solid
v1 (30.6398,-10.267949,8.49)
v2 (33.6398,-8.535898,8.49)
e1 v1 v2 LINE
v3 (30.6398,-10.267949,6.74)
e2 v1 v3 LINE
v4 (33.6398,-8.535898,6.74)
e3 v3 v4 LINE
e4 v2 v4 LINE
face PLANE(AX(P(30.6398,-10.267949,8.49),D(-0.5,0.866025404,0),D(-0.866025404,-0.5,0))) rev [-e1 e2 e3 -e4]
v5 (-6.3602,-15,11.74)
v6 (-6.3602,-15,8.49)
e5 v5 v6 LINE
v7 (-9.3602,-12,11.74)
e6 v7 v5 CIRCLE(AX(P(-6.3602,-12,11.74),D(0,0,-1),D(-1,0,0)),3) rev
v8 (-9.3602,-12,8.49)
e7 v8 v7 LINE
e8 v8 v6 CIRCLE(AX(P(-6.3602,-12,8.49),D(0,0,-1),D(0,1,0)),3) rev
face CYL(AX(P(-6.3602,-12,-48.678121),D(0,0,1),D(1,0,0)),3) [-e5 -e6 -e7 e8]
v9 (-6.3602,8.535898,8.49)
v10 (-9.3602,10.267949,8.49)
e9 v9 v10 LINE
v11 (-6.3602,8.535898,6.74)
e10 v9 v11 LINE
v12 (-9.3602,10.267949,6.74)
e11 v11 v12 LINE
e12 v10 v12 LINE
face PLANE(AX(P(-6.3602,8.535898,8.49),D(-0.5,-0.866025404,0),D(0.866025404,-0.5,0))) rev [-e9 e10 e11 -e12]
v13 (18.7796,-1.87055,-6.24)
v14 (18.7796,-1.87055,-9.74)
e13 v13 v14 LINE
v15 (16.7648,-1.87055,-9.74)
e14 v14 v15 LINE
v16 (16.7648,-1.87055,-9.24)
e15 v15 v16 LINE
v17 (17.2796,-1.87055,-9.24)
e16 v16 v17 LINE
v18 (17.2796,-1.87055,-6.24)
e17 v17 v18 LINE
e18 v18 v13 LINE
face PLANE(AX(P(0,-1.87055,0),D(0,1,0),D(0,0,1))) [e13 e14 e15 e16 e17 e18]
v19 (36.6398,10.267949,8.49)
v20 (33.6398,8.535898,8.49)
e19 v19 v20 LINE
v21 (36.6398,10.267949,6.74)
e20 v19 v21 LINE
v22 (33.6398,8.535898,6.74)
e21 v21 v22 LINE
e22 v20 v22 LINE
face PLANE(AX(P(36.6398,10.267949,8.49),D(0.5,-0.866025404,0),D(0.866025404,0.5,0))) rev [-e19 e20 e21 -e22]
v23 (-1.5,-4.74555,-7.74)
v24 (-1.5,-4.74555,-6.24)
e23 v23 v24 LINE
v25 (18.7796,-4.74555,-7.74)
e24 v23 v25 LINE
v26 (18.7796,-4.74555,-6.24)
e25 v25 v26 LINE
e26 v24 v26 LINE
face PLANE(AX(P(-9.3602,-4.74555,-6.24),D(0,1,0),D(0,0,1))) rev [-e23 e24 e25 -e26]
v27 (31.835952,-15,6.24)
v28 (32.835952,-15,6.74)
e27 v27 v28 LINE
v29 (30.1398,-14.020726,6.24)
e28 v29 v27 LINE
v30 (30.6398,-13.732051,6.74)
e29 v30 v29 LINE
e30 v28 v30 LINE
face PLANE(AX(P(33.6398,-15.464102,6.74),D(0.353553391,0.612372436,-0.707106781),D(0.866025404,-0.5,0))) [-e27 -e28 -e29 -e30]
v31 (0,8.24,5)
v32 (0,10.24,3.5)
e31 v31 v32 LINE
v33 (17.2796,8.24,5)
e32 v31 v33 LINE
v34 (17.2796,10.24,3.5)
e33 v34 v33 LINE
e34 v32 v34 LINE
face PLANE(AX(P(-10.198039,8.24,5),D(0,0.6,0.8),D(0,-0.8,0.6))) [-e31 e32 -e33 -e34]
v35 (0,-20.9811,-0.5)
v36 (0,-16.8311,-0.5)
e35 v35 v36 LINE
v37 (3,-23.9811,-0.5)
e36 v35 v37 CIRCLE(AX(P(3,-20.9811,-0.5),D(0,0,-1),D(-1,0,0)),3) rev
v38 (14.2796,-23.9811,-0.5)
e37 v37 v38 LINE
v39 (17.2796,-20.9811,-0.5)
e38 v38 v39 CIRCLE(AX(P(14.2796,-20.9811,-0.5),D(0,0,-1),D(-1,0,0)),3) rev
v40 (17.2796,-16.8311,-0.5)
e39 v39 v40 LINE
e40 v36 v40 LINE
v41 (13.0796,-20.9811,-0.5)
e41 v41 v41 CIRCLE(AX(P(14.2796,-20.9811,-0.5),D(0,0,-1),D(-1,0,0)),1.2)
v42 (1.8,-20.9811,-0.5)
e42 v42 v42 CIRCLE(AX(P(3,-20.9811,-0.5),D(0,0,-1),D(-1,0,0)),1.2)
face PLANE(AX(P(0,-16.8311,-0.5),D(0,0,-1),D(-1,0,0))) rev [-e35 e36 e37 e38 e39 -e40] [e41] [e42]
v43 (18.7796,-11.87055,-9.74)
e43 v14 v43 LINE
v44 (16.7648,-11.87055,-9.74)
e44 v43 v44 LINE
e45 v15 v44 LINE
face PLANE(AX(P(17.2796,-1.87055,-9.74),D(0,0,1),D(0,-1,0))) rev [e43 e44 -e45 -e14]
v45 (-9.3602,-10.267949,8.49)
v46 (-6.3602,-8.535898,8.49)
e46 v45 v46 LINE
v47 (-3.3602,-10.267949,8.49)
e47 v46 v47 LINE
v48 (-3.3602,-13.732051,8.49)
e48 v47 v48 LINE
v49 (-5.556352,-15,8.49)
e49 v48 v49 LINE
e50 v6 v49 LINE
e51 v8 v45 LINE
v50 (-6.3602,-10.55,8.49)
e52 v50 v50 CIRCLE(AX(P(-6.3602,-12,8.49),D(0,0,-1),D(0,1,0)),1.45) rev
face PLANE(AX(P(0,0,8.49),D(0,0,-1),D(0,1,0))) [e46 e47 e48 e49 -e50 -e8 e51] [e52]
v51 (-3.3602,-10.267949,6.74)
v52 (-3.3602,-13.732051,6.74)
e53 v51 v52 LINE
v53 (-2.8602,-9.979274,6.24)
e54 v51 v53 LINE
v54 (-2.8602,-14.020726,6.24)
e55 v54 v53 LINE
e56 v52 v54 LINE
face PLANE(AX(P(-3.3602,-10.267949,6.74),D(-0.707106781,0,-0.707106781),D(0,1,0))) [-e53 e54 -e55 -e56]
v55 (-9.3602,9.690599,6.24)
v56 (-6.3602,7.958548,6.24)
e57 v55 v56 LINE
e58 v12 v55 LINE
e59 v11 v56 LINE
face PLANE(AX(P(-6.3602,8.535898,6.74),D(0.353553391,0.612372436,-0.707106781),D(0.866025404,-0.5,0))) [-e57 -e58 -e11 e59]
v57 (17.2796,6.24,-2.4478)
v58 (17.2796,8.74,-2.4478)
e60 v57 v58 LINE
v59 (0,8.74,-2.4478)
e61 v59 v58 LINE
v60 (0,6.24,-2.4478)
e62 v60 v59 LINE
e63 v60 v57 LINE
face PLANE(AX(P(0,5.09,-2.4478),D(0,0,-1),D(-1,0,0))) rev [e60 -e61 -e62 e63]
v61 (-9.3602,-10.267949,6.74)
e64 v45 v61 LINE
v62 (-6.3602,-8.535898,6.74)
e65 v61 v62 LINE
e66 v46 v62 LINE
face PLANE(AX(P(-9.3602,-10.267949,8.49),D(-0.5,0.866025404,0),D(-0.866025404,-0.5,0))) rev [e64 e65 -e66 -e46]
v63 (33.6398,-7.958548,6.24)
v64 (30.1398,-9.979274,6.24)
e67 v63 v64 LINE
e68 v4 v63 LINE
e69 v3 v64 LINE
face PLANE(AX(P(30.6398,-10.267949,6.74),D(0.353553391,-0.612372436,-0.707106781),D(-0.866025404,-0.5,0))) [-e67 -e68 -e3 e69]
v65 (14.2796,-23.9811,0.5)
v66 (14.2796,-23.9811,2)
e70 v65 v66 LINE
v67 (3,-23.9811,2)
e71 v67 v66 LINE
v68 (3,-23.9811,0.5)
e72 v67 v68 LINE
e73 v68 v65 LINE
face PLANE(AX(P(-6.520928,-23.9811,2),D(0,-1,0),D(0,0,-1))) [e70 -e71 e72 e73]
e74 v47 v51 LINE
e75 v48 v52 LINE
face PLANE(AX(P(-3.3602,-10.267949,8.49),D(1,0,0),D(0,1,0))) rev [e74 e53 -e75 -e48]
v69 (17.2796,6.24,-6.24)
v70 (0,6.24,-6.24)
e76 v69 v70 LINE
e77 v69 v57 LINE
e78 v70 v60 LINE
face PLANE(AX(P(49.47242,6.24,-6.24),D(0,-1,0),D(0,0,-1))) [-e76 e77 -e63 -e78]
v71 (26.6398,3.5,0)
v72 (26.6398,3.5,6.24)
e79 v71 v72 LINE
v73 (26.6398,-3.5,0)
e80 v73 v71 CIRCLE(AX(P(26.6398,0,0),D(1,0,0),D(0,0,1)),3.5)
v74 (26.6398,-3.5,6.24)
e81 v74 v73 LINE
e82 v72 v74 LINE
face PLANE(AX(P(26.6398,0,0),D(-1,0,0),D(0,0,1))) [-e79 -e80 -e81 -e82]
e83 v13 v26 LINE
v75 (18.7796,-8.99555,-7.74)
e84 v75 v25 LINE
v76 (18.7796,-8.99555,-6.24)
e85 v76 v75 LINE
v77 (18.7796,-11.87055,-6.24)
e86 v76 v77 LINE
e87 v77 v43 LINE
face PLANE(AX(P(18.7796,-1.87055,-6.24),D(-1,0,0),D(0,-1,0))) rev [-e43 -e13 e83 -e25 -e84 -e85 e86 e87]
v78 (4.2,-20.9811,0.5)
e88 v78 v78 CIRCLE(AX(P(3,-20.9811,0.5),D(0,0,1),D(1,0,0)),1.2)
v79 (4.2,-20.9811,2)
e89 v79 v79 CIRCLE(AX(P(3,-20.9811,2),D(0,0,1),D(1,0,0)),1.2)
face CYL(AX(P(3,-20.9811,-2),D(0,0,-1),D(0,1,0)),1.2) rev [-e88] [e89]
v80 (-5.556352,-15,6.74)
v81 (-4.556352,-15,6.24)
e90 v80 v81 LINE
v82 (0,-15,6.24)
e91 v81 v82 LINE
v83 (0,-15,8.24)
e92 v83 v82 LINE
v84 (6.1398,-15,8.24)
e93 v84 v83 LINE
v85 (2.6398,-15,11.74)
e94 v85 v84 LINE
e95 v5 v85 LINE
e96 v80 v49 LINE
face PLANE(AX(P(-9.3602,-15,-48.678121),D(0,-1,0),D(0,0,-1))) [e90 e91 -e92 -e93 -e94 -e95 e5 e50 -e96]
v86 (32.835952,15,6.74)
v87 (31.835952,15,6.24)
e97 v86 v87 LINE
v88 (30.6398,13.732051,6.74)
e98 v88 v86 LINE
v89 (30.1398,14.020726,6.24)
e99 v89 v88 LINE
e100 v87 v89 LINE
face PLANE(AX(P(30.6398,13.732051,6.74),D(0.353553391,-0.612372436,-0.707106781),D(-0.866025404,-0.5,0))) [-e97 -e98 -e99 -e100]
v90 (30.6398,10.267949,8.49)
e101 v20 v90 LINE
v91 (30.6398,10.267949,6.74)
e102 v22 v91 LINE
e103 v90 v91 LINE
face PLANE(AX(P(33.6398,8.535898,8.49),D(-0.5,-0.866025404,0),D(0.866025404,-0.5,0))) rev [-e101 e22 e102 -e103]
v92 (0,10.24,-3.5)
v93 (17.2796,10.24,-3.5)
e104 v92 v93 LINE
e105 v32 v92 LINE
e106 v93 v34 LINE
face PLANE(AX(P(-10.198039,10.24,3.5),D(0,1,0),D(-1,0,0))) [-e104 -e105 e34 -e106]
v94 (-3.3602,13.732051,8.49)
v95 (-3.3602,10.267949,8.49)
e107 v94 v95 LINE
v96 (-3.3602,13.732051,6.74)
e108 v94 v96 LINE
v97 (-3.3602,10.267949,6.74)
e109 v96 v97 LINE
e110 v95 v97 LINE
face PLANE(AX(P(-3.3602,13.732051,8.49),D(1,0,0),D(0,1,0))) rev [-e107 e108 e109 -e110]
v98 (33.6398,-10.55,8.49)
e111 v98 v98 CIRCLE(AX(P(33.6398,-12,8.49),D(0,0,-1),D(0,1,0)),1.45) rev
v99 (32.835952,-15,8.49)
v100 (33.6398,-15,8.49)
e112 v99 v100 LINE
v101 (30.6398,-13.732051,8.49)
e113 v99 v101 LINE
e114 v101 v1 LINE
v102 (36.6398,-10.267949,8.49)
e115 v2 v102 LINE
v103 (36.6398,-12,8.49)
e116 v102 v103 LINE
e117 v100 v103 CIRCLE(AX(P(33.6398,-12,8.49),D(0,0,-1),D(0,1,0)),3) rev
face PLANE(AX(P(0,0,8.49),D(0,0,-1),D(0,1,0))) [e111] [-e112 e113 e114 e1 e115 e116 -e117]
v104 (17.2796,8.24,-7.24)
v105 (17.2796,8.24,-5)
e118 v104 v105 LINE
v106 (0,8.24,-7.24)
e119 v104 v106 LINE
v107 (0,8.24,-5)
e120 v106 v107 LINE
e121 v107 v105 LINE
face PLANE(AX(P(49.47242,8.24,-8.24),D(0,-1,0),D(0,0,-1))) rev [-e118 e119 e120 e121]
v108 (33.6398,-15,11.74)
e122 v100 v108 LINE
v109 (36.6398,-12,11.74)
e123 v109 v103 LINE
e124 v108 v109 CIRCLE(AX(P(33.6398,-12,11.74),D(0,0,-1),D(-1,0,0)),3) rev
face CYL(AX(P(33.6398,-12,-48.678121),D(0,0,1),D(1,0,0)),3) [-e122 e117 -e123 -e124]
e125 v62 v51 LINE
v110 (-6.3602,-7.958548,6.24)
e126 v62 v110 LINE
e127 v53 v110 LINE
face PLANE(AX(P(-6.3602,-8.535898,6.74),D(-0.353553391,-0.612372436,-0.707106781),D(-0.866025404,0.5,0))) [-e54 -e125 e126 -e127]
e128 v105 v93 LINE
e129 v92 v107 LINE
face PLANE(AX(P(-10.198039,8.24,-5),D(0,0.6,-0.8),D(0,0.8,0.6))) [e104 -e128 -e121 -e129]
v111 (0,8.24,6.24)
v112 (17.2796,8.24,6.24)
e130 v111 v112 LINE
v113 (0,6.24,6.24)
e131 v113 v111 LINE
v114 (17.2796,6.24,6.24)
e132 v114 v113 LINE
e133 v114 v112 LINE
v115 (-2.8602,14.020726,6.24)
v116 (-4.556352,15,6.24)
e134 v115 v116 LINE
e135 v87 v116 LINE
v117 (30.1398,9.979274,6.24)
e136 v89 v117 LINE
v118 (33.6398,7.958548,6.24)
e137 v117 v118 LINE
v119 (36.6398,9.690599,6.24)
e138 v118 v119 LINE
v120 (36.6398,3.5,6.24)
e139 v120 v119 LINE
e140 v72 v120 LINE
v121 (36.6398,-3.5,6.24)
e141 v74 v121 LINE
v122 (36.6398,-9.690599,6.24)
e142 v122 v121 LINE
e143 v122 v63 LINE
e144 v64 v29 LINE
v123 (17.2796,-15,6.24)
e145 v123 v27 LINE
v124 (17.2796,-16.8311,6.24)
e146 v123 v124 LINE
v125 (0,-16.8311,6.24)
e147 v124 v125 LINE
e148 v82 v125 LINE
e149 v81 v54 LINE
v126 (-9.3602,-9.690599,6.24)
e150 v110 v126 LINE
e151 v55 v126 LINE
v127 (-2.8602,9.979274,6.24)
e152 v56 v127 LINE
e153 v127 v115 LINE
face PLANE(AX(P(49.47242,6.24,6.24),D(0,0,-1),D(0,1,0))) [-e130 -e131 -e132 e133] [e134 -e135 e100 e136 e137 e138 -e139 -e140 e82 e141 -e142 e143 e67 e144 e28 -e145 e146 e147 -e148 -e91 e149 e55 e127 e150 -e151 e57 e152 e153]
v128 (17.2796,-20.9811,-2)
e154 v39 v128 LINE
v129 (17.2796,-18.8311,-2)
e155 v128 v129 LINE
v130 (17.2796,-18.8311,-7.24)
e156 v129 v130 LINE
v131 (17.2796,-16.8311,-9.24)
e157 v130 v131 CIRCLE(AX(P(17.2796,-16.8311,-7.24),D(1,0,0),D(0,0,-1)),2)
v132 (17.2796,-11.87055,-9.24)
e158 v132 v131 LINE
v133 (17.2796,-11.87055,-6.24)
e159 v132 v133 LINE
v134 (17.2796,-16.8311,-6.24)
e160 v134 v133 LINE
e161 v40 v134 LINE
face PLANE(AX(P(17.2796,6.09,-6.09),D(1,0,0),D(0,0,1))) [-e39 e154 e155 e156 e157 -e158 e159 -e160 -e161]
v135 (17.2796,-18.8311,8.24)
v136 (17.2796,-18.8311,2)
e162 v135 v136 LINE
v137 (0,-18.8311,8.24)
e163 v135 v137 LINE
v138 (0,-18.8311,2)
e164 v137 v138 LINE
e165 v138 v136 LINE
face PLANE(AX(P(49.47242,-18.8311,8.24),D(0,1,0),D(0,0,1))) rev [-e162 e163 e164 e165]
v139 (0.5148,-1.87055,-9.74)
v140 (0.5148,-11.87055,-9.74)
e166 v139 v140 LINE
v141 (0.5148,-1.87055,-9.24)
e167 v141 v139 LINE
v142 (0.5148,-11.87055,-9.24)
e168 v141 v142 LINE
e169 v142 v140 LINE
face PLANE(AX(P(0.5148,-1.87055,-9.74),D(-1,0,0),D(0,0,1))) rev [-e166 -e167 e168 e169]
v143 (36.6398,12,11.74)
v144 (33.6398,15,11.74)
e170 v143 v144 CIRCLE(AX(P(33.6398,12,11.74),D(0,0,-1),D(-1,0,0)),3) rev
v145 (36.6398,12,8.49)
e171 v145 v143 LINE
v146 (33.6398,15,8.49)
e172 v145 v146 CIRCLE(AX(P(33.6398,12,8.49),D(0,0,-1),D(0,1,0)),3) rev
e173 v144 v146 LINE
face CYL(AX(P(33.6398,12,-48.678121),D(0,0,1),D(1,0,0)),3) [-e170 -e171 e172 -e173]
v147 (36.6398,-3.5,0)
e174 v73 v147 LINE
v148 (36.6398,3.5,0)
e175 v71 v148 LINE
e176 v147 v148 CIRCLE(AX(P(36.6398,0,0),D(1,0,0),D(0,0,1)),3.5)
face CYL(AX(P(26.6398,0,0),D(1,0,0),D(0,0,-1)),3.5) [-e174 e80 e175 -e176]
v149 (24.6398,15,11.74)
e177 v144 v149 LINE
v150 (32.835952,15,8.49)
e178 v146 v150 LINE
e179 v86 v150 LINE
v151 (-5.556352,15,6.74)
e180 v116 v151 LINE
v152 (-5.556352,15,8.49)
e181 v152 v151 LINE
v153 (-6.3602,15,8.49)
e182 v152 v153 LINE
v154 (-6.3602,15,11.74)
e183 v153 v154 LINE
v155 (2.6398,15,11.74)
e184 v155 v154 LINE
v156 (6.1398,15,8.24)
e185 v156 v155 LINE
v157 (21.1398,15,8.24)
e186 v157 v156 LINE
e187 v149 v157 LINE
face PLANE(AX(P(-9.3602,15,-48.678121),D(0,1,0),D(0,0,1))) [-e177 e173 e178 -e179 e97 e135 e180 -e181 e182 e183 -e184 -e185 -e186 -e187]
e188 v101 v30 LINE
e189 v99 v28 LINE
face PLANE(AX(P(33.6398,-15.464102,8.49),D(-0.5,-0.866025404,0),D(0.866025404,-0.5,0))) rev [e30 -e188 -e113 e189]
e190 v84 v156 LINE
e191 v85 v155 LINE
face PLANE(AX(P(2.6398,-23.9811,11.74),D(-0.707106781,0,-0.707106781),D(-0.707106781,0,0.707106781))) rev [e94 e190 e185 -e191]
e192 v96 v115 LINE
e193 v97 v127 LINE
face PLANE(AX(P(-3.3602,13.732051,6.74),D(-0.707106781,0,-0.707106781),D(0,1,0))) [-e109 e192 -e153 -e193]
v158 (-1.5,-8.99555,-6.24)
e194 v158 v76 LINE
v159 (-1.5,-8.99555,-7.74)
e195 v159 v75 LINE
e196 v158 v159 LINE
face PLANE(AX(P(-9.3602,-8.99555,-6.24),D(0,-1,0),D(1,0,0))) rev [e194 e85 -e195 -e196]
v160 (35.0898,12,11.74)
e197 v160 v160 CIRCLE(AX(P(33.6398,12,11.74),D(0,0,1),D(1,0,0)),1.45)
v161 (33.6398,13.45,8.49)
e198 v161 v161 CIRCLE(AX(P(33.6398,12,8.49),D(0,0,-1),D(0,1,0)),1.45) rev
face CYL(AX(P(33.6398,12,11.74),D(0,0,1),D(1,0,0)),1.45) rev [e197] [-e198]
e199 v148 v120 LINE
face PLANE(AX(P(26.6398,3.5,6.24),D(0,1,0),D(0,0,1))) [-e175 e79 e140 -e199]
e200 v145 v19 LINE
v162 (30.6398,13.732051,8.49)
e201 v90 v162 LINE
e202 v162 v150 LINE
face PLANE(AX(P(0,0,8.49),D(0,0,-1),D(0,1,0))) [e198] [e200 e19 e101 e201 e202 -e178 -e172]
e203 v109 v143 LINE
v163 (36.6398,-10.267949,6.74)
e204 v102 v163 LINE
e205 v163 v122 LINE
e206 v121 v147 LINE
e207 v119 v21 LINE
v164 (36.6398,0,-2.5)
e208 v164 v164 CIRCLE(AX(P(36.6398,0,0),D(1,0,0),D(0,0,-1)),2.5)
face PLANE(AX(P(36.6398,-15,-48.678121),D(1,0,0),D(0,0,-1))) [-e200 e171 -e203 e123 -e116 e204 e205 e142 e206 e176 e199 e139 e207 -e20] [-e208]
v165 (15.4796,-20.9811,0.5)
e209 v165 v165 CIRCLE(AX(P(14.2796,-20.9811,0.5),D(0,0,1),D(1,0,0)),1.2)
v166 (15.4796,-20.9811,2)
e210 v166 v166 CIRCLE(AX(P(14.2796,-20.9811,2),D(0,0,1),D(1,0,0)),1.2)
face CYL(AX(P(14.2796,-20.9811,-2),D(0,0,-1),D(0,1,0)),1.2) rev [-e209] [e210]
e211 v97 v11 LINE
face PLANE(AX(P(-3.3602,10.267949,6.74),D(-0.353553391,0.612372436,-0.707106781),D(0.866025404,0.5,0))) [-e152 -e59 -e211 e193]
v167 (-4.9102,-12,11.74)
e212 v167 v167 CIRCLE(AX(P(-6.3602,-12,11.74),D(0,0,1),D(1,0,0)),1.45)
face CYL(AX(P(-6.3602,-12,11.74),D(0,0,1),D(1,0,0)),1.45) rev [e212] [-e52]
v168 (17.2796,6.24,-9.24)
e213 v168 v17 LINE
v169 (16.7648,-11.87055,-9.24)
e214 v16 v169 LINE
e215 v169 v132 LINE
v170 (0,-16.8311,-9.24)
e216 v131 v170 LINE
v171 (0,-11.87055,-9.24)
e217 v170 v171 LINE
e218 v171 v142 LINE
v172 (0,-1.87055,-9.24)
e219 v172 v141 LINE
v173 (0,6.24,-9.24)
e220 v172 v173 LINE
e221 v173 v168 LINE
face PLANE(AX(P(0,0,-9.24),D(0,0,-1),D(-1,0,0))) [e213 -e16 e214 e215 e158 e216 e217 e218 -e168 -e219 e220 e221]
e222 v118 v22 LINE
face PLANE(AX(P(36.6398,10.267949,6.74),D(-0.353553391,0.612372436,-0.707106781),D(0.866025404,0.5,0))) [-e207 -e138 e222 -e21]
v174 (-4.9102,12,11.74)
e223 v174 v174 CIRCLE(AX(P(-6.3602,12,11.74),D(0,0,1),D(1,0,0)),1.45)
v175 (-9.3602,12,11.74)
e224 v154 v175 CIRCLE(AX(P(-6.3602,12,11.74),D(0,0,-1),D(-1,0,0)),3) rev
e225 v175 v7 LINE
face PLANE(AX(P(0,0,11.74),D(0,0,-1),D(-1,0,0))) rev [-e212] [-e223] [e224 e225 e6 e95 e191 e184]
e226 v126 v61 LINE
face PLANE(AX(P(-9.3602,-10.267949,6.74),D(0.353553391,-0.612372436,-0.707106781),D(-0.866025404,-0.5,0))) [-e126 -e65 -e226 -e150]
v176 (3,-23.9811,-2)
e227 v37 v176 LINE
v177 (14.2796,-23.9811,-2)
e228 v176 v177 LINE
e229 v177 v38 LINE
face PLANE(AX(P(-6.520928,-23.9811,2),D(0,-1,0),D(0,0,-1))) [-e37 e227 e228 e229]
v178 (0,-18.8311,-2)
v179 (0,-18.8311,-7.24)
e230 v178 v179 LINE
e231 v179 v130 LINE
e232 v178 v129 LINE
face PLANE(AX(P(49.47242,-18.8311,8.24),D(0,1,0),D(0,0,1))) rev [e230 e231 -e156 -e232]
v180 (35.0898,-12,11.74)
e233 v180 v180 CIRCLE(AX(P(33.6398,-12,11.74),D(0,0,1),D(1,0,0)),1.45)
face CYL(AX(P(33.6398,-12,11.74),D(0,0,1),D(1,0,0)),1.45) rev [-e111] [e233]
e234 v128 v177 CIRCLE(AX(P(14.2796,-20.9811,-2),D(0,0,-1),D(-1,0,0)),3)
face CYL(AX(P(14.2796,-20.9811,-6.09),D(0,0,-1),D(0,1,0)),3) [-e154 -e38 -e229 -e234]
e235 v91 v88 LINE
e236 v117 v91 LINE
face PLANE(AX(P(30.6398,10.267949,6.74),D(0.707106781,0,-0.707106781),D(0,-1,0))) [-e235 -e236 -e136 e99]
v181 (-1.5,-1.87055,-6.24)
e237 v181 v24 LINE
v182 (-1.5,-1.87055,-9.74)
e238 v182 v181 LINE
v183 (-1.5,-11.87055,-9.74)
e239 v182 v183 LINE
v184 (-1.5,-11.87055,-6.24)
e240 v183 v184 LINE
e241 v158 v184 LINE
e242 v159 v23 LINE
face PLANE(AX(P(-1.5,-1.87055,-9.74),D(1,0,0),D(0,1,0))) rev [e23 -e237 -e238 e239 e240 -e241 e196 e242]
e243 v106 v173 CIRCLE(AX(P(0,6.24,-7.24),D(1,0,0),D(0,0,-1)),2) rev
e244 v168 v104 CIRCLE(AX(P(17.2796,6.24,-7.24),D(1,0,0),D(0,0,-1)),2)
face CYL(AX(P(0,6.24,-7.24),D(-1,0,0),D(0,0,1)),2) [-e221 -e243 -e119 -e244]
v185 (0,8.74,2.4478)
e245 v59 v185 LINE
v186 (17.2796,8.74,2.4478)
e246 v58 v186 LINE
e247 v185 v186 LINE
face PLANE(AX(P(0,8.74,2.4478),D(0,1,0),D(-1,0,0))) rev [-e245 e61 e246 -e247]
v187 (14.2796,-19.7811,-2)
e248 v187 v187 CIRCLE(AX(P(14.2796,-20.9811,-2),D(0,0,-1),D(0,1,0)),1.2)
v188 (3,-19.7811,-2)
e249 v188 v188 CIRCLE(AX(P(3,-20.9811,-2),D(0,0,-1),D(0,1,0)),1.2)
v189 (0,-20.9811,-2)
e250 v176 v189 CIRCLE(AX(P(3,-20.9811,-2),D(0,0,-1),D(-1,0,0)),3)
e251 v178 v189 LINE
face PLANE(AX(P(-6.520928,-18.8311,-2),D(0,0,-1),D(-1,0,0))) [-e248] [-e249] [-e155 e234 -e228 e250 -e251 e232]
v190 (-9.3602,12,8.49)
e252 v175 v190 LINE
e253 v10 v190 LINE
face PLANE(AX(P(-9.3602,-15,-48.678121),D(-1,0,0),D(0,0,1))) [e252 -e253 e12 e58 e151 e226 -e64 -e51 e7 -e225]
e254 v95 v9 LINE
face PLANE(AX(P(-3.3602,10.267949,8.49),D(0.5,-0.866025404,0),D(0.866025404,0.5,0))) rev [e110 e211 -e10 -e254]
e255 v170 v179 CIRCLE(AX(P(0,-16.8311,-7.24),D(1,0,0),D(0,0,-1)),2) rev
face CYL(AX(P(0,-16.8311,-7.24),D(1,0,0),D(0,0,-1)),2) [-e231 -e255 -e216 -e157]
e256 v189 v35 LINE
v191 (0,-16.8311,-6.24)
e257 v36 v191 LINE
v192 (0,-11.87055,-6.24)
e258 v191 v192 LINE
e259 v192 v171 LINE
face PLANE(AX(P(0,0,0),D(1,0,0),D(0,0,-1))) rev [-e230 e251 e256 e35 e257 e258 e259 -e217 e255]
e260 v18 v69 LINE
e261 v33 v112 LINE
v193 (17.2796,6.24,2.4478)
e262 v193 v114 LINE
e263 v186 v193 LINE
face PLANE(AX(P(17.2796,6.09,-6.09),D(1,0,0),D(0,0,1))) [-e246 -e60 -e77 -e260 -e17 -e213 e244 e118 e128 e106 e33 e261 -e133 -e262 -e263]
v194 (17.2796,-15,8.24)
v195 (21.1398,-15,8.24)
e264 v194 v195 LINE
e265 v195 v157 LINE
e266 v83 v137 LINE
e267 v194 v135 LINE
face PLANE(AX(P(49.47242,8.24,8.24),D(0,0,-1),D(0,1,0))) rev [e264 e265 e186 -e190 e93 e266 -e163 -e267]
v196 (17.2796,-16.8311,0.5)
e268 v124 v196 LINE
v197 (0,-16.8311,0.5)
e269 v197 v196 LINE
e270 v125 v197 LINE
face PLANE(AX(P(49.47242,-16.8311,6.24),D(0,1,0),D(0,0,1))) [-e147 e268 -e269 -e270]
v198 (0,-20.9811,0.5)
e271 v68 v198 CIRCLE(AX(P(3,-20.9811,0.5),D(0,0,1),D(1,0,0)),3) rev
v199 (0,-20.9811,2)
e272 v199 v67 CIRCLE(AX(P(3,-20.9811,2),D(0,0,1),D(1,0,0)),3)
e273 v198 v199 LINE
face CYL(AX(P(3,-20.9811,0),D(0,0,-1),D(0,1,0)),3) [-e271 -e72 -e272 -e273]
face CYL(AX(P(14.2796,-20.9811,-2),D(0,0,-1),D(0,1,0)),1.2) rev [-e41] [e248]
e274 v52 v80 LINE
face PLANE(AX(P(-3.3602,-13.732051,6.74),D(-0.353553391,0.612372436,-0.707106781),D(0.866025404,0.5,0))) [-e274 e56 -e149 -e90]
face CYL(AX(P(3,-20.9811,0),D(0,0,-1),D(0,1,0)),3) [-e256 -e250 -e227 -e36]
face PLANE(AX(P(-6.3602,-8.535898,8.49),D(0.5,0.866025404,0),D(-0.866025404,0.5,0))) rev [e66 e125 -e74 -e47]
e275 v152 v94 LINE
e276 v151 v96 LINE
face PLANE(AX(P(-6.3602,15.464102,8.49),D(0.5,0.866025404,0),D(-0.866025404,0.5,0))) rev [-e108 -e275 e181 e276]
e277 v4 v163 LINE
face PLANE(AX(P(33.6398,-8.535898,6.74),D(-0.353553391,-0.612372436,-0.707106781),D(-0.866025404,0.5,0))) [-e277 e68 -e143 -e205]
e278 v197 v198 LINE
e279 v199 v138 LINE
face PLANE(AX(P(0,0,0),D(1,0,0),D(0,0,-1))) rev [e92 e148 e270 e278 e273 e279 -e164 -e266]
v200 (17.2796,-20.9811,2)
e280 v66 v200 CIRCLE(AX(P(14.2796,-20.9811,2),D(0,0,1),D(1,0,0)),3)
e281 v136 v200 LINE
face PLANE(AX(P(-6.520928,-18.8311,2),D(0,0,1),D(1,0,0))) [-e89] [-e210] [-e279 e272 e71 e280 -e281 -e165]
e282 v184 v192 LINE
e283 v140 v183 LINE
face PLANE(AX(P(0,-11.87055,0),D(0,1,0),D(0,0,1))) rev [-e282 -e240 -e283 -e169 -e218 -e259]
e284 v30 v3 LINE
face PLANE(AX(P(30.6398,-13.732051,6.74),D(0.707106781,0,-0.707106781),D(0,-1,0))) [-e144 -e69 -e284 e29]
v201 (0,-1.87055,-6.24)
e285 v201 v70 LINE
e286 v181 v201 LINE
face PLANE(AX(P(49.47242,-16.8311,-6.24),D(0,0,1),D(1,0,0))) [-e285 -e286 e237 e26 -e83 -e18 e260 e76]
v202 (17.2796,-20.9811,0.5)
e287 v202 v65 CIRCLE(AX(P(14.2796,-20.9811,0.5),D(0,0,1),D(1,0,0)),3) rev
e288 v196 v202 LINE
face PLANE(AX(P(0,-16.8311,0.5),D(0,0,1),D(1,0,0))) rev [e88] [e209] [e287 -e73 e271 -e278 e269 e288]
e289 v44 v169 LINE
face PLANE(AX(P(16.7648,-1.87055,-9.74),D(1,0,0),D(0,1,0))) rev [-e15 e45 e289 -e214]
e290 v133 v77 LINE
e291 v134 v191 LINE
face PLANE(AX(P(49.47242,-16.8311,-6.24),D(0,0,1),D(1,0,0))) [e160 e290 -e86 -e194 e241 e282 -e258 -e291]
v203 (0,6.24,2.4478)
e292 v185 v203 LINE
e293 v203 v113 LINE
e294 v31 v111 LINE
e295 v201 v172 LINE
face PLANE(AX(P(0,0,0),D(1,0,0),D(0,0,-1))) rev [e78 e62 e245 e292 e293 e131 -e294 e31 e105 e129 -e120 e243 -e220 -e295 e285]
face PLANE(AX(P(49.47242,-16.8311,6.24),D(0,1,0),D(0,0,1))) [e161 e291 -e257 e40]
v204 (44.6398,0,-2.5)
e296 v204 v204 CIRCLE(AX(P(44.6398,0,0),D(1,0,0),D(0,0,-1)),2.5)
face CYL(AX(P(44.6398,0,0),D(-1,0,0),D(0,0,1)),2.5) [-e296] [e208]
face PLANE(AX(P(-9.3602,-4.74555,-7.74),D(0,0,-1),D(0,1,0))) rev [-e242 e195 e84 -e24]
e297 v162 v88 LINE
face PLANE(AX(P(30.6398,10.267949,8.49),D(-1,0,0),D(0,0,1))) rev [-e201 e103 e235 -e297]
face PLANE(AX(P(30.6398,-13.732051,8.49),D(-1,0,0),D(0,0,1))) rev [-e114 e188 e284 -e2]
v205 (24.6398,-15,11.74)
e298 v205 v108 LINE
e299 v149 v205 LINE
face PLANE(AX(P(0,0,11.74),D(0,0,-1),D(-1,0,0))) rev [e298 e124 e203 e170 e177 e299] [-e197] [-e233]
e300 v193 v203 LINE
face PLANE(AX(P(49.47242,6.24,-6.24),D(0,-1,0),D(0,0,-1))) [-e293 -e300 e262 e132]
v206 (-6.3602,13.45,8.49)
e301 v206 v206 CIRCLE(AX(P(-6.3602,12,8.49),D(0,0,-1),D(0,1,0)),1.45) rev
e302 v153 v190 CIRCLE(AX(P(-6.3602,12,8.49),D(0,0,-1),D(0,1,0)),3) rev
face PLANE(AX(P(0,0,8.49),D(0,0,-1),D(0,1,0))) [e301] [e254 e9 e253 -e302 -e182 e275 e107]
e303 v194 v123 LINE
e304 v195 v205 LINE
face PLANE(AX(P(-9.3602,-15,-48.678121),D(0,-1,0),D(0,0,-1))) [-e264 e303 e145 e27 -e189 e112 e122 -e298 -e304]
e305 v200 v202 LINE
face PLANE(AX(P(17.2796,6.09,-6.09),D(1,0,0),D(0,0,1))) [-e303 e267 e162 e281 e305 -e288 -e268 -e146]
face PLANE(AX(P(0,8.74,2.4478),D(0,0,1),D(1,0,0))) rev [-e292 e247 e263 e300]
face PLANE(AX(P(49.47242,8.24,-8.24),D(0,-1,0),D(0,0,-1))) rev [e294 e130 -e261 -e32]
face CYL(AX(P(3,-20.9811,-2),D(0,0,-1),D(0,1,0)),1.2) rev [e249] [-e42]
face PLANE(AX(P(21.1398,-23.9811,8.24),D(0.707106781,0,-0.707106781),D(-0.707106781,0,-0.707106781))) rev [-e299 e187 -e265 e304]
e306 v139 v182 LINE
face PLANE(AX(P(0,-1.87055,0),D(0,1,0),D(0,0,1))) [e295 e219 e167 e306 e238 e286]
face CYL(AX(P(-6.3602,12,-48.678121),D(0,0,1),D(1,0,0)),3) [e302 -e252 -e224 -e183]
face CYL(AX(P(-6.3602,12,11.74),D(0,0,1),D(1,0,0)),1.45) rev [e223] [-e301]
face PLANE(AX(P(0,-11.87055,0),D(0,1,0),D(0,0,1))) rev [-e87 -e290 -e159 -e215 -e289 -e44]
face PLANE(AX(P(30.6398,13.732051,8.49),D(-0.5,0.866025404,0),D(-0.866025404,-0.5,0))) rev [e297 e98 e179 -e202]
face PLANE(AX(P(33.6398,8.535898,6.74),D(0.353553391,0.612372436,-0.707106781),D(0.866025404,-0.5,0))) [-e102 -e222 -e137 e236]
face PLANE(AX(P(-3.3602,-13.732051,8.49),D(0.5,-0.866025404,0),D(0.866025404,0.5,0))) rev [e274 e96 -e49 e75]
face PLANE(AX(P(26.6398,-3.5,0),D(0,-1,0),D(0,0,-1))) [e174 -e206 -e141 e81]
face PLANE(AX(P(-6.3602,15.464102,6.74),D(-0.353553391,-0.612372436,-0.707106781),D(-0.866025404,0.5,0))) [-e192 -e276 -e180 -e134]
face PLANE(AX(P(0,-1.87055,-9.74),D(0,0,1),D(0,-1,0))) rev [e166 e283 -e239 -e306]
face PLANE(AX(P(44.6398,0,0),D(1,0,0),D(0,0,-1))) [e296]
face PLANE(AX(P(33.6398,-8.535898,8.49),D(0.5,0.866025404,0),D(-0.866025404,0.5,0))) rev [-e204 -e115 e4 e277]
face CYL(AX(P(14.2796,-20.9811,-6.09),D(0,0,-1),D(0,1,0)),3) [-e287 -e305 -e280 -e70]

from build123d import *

# Parameters (mm, degrees)
MICRO_SERVO_MOUNT_BASE_PART_CAMERA_TUR_DEPTH = 17.2796
MICRO_START                                  = -8.24
MICRO_SERVO_MOUNT_BASE_PART_CAMERA_3_O_R     = 1.2
MICRO_SERVO_MOUNT_BASE_PART_CAMERA_3_DEPTH   = 16.48
SKETCH7_W                                    = 46
SKETCH7_H                                    = 30
BOSS_EXTRUDE1_DEPTH                          = 3.5
BOSS_EXTRUDE1_DIRECTION_2_REACH              = 35.842
M2_5_CLEARANCE_HOLE1_D                       = 2.9
FILLET1_R                                    = 3
BOSS_EXTRUDE2_DEPTH                          = 10
SKETCH11_R                                   = 2.5
BOSS_EXTRUDE3_DEPTH                          = 8
SKETCH14_W                                   = 17.2796
SKETCH14_H                                   = 27.0711
BOSS_EXTRUDE5_DEPTH                          = 1
BOSS_EXTRUDE4_DEPTH                          = 5
SKETCH13_W                                   = 1.5
SKETCH13_H                                   = 4.25
CUT_EXTRUDE1_DEPTH                           = 39.791353434
FILLET2_R                                    = 2
CUT_EXTRUDE2_DEPTH                           = 2.25
CUT_EXTRUDE3_DEPTH                           = 61.415771958
CHAMFER1_SIZE                                = 0.5


with BuildPart() as part:
    # Micro Servo Mount Base Part - Camera Tur: read off the stored shape, not the designer's step
    # Micro Servo Mount Base Part - Camera 2 → Micro Servo Mount Base Part - Camera Tur (new body)
    with BuildSketch(Plane.YZ):
        Polygon((-23.9811, 0.5), (-16.8311, 0.5), (-16.8311, 6.24), (6.24, 6.24), (6.24, 2.4478), (8.74, 2.4478), (8.74, -2.4478), (6.24, -2.4478), (6.24, -6.24), (-16.8311, -6.24), (-16.8311, -0.5), (-23.9811, -0.5), (-23.9811, -2), (-18.8311, -2), (-18.8311, -8.24), (8.24, -8.24), (8.24, -5), (10.24, -3.5), (10.24, 3.5), (8.24, 5), (8.24, 8.24), (-18.8311, 8.24), (-18.8311, 2), (-23.9811, 2), align=None)
    extrude(amount=MICRO_SERVO_MOUNT_BASE_PART_CAMERA_TUR_DEPTH)

    # Micro Servo Mount Base Part - Camera 3 o → Micro Servo Mount Base Part - Camera 3 (cut)
    with BuildSketch(Plane.XY.offset(MICRO_START)):
        with BuildLine():
            Line((0, -23.9811), (3, -23.9811))
            ThreePointArc((3, -23.9811), (0.878679656, -23.102420344), (0, -20.9811))
            Line((0, -20.9811), (0, -23.9811))
        make_face()
        with BuildLine():
            ThreePointArc((17.2796, -20.9811), (16.400920344, -23.102420344), (14.2796, -23.9811))
            Line((14.2796, -23.9811), (17.2796, -23.9811))
            Line((17.2796, -23.9811), (17.2796, -20.9811))
        make_face()
        with Locations((3, -20.9811)):
            Circle(MICRO_SERVO_MOUNT_BASE_PART_CAMERA_3_O_R)
        with Locations((14.2796, -20.9811)):
            Circle(MICRO_SERVO_MOUNT_BASE_PART_CAMERA_3_O_R)
    extrude(amount=MICRO_SERVO_MOUNT_BASE_PART_CAMERA_3_DEPTH, mode=Mode.SUBTRACT)

    # Sketch7 → Boss-Extrude1 (add)
    with BuildSketch(Plane.XY.offset(8.24)):
        with Locations((13.6398, 0)):
            Rectangle(SKETCH7_W, SKETCH7_H)
    extrude(amount=BOSS_EXTRUDE1_DEPTH)

    # Boss-Extrude1 direction 2: up to this face of the body (flat: up to its plane)
    boss_extrude1_direction_2_end = Plane(part.part.faces().sort_by_distance((8.6398, -5.29555, 6.24))[0])
    # Sketch7 → Boss-Extrude1 direction 2 (add, up to the picked face)
    with BuildSketch(Plane.XY.offset(8.24), mode=Mode.PRIVATE) as boss_extrude1_direction_2_sk1:
        with Locations((13.6398, 0)):
            Rectangle(SKETCH7_W, SKETCH7_H)
    boss_extrude1_direction_2_tool1 = split(extrude(boss_extrude1_direction_2_sk1.sketch, amount=-BOSS_EXTRUDE1_DIRECTION_2_REACH, mode=Mode.PRIVATE), bisect_by=boss_extrude1_direction_2_end, keep=Keep.BOTH, mode=Mode.PRIVATE)
    add(boss_extrude1_direction_2_tool1.solids().sort_by(Axis((13.6398, 0, 8.24), (0, 0, -1)))[0])

    # M2.5 Clearance Hole1 (through all)
    with Locations(Plane.XY.offset(11.74)):
        with Locations((-6.3602, 12), (33.6398, 12), (33.6398, -12), (-6.3602, -12)):
            Hole(M2_5_CLEARANCE_HOLE1_D / 2)

    # Fillet1
    fillet1_edges = [part.edges().sort_by_distance(p)[0] for p in [
        (36.6398, -15, 8.99),
        (-9.3602, 15, 8.99),
        (-9.3602, -15, 8.99),
        (36.6398, 15, 8.99),
    ]]
    fillet(fillet1_edges, radius=FILLET1_R)

    # Sketch10 → Boss-Extrude2 (add)
    with BuildSketch(Plane(origin=(36.6398, 0, 0), x_dir=(0, 0, -1), z_dir=(1, 0, 0))):
        with BuildLine():
            Line((-6.24, 3.5), (0, 3.5))
            ThreePointArc((0, 3.5), (3.5, 0), (0, -3.5))
            Line((0, -3.5), (-6.24, -3.5))
            Line((-6.24, -3.5), (-6.24, 3.5))
        make_face()
    extrude(amount=-BOSS_EXTRUDE2_DEPTH)

    # Sketch11 → Boss-Extrude3 (add)
    with BuildSketch(Plane(origin=(36.6398, 0, 0), x_dir=(0, 0, -1), z_dir=(1, 0, 0))):
        Circle(SKETCH11_R)
    extrude(amount=BOSS_EXTRUDE3_DEPTH)

    # Sketch14 → Boss-Extrude5 (add)
    with BuildSketch(Plane(origin=(0, 0, -8.24), x_dir=(-1, 0, 0), z_dir=(0, 0, -1))):
        with Locations((-8.6398, -5.29555)):
            Rectangle(SKETCH14_W, SKETCH14_H)
    extrude(amount=BOSS_EXTRUDE5_DEPTH)

    # Sketch12 → Boss-Extrude4 (add, symmetric)
    with BuildSketch(Plane(origin=(0, -6.87055, 0), x_dir=(1, 0, 0), z_dir=(0, 1, 0))):
        Polygon((0, 9.74), (0.5148, 9.74), (0.5148, 9.24), (0, 9.24), (0, 6.24), (-1.5, 6.24), (-1.5, 9.74), align=None)
        Polygon((17.2796, 6.24), (18.7796, 6.24), (18.7796, 9.74), (17.2796, 9.74), (16.7648, 9.74), (16.7648, 9.24), (17.2796, 9.24), align=None)
    extrude(amount=BOSS_EXTRUDE4_DEPTH, both=True)

    # Sketch13 → Cut-Extrude1 (cut, through all)
    with BuildSketch(Plane(origin=(18.7796, 0, 0), x_dir=(0, 0, -1), z_dir=(1, 0, 0))):
        with Locations((6.99, -6.87055)):
            Rectangle(SKETCH13_W, SKETCH13_H)
    extrude(amount=-CUT_EXTRUDE1_DEPTH, mode=Mode.SUBTRACT)

    # Fillet2
    fillet2_edges = [part.edges().sort_by_distance(p)[0] for p in [
        (8.6398, -18.8311, -9.24),
        (8.6398, 8.24, -9.24),
    ]]
    fillet(fillet2_edges, radius=FILLET2_R)

    # Sketch15 → Cut-Extrude2 (cut)
    with BuildSketch(Plane(origin=(0, 0, 6.24), x_dir=(-1, 0, 0), z_dir=(0, 0, -1))):
        Polygon((9.3602, 13.732050808), (6.3602, 15.464101615), (3.3602, 13.732050808), (3.3602, 10.267949192), (6.3602, 8.535898385), (9.3602, 10.267949192), align=None)
        Polygon((9.3602, -10.267949192), (6.3602, -8.535898385), (3.3602, -10.267949192), (3.3602, -13.732050808), (6.3602, -15.464101615), (9.3602, -13.732050808), align=None)
        Polygon((-36.6398, -10.267949192), (-36.6398, -13.732050808), (-33.6398, -15.464101615), (-30.6398, -13.732050808), (-30.6398, -10.267949192), (-33.6398, -8.535898385), align=None)
        Polygon((-36.6398, 13.732050808), (-36.6398, 10.267949192), (-33.6398, 8.535898385), (-30.6398, 10.267949192), (-30.6398, 13.732050808), (-33.6398, 15.464101615), align=None)
    extrude(amount=-CUT_EXTRUDE2_DEPTH, mode=Mode.SUBTRACT)

    # Sketch16 → Cut-Extrude3 (cut, through all)
    with BuildSketch(Plane(origin=(0, 15, 0), x_dir=(1, 0, 0), z_dir=(0, 1, 0))):
        Polygon((2.6398, -11.74), (6.1398, -8.24), (21.1398, -8.24), (24.6398, -11.74), align=None)
    extrude(amount=-CUT_EXTRUDE3_DEPTH, mode=Mode.SUBTRACT)

    # Chamfer1
    chamfer1_edges = [part.edges().sort_by_distance(p)[0] for p in [
        (35.1398, 9.401923789, 6.24),
        (32.1398, 9.401923789, 6.24),
        (30.6398, 12, 6.24),
        (31.737876211, 14.366025404, 6.24),
        (31.737876211, -14.366025404, 6.24),
        (30.6398, -12, 6.24),
        (32.1398, -9.401923789, 6.24),
        (35.1398, -9.401923789, 6.24),
        (-7.8602, -9.401923789, 6.24),
        (-4.8602, -9.401923789, 6.24),
        (-3.3602, -12, 6.24),
        (-4.458276211, -14.366025404, 6.24),
        (-4.458276211, 14.366025404, 6.24),
        (-3.3602, 12, 6.24),
        (-4.8602, 9.401923789, 6.24),
        (-7.8602, 9.401923789, 6.24),
    ]]
    chamfer(chamfer1_edges, length=CHAMFER1_SIZE)


solid = part.part
